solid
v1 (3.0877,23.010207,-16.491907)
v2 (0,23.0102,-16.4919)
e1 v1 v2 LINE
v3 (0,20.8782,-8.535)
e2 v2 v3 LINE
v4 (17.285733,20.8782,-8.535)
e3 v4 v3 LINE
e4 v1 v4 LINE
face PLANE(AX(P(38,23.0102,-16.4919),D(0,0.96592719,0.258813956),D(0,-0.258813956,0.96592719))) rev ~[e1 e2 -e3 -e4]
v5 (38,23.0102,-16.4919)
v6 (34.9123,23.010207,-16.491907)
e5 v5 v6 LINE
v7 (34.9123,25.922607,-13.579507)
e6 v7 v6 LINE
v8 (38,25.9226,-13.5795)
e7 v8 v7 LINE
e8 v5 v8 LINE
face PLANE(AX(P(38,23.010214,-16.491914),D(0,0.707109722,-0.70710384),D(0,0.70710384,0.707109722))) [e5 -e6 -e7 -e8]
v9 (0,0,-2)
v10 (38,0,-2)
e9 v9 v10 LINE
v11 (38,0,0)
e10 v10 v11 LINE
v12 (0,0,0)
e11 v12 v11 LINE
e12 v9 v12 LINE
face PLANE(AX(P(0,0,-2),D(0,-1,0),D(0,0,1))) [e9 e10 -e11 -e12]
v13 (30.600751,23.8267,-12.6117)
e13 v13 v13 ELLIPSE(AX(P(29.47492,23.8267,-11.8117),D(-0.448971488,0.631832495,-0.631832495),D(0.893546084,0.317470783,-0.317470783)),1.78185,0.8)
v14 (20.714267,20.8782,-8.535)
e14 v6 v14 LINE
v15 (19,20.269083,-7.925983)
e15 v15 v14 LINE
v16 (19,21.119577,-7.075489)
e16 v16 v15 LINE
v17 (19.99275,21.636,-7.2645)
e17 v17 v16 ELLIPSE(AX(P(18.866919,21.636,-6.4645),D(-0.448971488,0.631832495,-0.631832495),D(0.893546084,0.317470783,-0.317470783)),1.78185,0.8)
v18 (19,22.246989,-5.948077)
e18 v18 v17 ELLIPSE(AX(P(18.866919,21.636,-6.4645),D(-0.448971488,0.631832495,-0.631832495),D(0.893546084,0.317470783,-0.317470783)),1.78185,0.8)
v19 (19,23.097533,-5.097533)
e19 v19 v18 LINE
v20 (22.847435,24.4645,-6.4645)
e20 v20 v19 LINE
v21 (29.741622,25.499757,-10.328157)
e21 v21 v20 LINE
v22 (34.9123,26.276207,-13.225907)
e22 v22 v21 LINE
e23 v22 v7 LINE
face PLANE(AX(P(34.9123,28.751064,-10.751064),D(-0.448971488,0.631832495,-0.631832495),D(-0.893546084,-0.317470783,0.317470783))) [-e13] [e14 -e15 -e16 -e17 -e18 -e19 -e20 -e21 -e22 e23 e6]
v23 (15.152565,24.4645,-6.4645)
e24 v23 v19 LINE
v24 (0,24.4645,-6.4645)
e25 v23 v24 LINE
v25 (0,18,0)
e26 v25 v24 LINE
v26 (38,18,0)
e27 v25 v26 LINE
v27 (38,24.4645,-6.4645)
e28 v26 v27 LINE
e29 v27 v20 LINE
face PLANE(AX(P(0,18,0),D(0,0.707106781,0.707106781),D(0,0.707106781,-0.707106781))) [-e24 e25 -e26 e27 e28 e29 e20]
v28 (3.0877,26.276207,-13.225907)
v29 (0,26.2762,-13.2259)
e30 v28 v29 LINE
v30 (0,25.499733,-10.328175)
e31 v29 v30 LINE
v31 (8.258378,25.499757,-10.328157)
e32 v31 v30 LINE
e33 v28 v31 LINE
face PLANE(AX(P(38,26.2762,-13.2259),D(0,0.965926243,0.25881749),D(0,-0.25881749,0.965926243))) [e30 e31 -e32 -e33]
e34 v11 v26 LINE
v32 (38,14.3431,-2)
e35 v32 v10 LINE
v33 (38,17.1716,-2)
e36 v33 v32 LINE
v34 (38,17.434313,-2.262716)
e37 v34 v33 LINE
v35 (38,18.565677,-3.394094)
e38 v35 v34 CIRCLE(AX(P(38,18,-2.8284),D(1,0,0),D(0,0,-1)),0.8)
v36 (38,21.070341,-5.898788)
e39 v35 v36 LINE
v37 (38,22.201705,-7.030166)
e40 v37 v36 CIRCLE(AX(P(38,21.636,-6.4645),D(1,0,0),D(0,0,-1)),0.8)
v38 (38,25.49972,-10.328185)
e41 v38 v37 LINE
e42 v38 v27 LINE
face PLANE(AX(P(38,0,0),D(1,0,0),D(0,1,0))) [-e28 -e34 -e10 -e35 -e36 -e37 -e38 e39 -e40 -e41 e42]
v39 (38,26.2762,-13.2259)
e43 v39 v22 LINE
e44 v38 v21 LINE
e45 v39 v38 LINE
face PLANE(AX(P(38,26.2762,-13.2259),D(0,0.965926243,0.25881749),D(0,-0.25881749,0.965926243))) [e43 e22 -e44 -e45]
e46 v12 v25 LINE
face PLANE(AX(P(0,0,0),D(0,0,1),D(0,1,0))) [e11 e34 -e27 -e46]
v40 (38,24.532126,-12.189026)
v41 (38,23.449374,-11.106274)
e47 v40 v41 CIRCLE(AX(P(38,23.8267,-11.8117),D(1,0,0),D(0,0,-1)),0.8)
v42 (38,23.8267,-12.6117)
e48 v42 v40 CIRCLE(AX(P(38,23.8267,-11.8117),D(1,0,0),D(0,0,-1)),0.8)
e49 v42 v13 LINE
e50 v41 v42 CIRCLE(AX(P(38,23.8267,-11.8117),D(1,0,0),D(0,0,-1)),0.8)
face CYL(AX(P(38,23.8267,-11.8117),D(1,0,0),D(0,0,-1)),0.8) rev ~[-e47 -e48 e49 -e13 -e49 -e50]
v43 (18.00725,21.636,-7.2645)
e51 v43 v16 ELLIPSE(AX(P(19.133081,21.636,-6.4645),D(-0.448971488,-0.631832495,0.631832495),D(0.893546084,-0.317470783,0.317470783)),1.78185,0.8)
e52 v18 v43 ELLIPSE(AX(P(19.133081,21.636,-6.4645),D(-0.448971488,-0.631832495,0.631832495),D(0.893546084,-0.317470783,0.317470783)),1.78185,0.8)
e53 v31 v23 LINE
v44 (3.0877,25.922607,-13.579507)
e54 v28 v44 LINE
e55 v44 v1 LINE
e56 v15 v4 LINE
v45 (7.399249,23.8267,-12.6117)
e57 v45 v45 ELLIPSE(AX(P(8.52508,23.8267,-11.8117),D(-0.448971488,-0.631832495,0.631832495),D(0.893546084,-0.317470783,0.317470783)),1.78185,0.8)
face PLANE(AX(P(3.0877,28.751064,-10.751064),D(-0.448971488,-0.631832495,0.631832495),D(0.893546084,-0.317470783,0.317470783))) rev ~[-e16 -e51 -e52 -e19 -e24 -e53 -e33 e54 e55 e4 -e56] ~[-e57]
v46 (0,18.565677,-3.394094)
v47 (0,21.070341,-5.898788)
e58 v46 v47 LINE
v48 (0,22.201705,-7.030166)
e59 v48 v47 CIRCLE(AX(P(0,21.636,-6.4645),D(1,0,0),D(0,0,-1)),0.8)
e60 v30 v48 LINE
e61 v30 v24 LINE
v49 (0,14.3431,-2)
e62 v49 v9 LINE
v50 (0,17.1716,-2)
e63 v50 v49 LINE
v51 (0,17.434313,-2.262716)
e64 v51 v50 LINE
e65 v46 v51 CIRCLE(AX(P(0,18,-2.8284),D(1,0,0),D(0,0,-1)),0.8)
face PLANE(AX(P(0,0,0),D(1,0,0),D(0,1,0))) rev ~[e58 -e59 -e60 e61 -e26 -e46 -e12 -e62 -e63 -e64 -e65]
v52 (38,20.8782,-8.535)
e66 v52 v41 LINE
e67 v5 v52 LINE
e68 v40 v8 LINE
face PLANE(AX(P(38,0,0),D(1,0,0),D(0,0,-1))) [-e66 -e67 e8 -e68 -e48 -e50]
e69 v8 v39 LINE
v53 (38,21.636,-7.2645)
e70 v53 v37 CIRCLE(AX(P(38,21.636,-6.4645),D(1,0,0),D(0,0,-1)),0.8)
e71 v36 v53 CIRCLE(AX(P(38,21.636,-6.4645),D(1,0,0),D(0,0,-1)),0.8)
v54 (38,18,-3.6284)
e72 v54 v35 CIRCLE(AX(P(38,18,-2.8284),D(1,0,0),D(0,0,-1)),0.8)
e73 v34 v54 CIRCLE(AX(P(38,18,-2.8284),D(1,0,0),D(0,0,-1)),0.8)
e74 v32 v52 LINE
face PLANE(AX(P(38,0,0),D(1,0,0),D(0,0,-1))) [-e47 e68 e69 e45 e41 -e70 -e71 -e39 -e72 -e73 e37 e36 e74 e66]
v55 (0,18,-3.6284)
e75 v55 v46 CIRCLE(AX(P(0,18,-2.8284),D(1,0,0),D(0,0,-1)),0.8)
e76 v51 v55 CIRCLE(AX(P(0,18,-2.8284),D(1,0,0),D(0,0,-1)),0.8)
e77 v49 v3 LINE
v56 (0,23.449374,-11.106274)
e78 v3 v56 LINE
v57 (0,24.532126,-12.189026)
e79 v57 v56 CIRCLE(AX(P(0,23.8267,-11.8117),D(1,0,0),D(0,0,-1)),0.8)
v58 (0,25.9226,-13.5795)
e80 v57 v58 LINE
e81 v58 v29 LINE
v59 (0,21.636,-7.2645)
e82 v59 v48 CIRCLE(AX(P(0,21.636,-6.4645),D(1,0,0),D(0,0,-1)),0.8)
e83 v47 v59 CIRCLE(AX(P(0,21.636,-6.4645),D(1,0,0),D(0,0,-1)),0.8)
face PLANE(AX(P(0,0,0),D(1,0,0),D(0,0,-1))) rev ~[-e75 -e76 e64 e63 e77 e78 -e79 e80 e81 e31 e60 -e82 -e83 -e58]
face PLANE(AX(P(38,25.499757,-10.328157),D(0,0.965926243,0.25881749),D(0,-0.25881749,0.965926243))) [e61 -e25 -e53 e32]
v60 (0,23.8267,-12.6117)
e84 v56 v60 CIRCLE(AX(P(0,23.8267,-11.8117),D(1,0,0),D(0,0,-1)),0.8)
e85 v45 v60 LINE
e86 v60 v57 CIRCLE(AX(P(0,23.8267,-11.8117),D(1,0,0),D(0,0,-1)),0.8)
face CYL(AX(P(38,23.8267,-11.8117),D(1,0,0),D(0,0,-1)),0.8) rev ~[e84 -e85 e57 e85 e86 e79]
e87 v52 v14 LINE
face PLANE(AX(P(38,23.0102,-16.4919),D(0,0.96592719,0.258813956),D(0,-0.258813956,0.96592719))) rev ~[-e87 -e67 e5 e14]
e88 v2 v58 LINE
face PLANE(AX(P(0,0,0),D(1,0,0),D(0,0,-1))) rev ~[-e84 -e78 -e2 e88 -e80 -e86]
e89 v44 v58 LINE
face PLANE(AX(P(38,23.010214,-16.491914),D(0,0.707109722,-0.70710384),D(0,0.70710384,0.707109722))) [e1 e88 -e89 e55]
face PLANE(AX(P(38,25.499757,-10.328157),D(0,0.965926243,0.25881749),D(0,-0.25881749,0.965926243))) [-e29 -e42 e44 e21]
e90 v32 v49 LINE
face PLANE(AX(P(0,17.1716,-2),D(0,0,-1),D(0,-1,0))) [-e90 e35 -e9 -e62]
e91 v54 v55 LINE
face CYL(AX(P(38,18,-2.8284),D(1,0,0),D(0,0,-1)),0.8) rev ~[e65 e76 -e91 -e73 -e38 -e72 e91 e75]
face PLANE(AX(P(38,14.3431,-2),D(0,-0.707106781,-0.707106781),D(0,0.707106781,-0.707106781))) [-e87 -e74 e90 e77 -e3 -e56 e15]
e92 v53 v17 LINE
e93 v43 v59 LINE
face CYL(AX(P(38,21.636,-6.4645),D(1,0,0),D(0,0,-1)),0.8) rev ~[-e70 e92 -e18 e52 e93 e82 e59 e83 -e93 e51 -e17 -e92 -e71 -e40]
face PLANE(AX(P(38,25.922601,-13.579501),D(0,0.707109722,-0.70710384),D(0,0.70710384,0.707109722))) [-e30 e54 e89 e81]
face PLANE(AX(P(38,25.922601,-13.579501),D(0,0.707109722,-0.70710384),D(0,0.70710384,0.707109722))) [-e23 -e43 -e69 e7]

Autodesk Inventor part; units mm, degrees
ref_plane "YZ Plane" through (0, 0, 0) normal (1, 0, 0) x (0, 1, 0)
ref_plane "XZ Plane" through (0, 0, 0) normal (0, 1, 0) x (-1, 0, 0)
sketch "スケッチ1" plane through (0, 0, 0) normal (1, 0, 0) x (0, 1, 0)
  line L0 (0, 0) -> (18, 0)
  line L1 (18, 0) -> (18, -2)
  line L2 (18, -2) -> (0, -2)
  line L3 (0, -2) -> (0, 0)
  line L4 (18, 0) -> (39.2132, -21.2132)
  line L5 (39.2132, -21.2132) -> (37.799, -22.6274)
  line L6 (37.799, -22.6274) -> (17.1716, -2)
  dimension "d0" = 2
  dimension "d1" = 18
  dimension "d4" = 30
  dimension "d5" = 135
  dimension "d6" = 2
extrude "押し出し1" add sketch "スケッチ1" along normal blind 38
sketch "スケッチ2" plane through (38, 0, 0) normal (1, 0, 0) x (0, 0, -1)
  line L0 (13.2259, 26.2762) -> (6.4645, 24.4645) projected
  line L1 (2, 0) -> (2, 17.1716) projected
  line L2 (2, 17.1716) -> (22.6274, 37.799) projected
  line L3 (22.6274, 37.799) -> (21.2132, 39.2132) projected
  line L4 (21.2132, 39.2132) -> (0, 18) projected
  line L5 (0, 18) -> (0, 0) projected
  line L6 (0, 0) -> (2, 0) projected
  point P0 (10.3282, 25.4997)
extrude "押し出し2" cut sketch "スケッチ2" against normal through all contours L0 L4 L3 L2
sketch "スケッチ3" plane through (38, 0, 0) normal (1, 0, 0) x (0, 0, -1)
  line L0 (0, -0.1838) -> (49.5981, -49.7818) projected
  line L1 (49.5981, -49.7818) -> (50.9877, -48.3922) projected
  line L2 (50.9877, -48.3922) -> (50.3051, -40.5894) projected
  line L3 (50.3051, -40.5894) -> (38.2775, -28.5617) projected
  line L4 (38.2775, -28.5617) -> (34.3952, -14.0729) projected
  line L5 (34.3952, -14.0729) -> (39.6985, -8.7696) projected
  line L6 (25.2028, 5.7261) -> (39.6985, -8.7696) projected
  line L7 (25.2028, 9.9688) -> (25.2468, 10.0127) projected
  line L8 (25.2468, 14.2554) -> (13.2259, 26.2762) projected
  line L9 (13.2259, 26.2762) -> (6.4645, 24.4645) projected
  line L10 (6.4645, 24.4645) -> (0, 18) projected
  circle A0 centre (45.0018, -38.8216) radius 0.8 projected
  circle A1 centre (48.5373, -42.3571) radius 0.8 projected
  line L11 (25.2886, 2.8119) -> (28.6525, -0.552) projected
  arc A2 (29.0919, -1.6127) -> (28.6525, -0.552) centre (27.5919, -1.6127) ccw projected
  line L12 (29.0919, -1.6127) -> (29.0919, -20.7046) projected
  arc A3 (26.5312, -21.7652) -> (29.0919, -20.7046) centre (27.5919, -20.7046) ccw projected
  line L13 (26.5312, -21.7652) -> (23.1673, -18.4013) projected
  arc A4 (22.7279, -17.3406) -> (23.1673, -18.4013) centre (24.2279, -17.3406) ccw projected
  line L14 (22.7279, -17.3406) -> (22.7279, 1.7513) projected
  arc A5 (25.2886, 2.8119) -> (22.7279, 1.7513) centre (24.2279, 1.7513) ccw projected
  line L15 (13.8033, -9.0373) -> (10.4393, -5.6734) projected
  arc A6 (10, -4.6127) -> (10.4393, -5.6734) centre (11.5, -4.6127) ccw projected
  line L16 (10, -4.6127) -> (10, 14.4792) projected
  arc A7 (12.5607, 15.5398) -> (10, 14.4792) centre (11.5, 14.4792) ccw projected
  line L17 (12.5607, 15.5398) -> (15.9246, 12.1759) projected
  arc A8 (16.364, 11.1152) -> (15.9246, 12.1759) centre (14.864, 11.1152) ccw projected
  line L18 (16.364, 11.1152) -> (16.364, -7.9767) projected
  arc A9 (13.8033, -9.0373) -> (16.364, -7.9767) centre (14.864, -7.9767) ccw projected
  line L19 (2, 0) -> (2, 17.1716) projected
  line L20 (2, 14.3431) -> (13.5795, 25.9226)
  line L21 (16.4919, 23.0102) -> (8.535, 20.8782)
  line L22 (6.4645, 24.4645) -> (0, 18) projected
  line L23 (2, 17.1716) -> (10.3282, 25.4997) projected
  circle A10 centre (11.8117, 23.8267) radius 0.8 projected
  circle A11 centre (2.8284, 18) radius 0.8 projected
  circle A12 centre (6.4645, 21.636) radius 0.8 projected
  arc A13 (25.2468, 10.0127) -> (25.2468, 14.2554) centre (23.1254, 12.1341) ccw projected
  arc A14 (25.2028, 9.9688) -> (25.2028, 5.7261) centre (27.3241, 7.8475) ccw projected
  circle A15 centre (16.7615, 19.9122) radius 0.8 projected
  circle A16 centre (20.297, 16.3767) radius 0.8 projected
  line L24 (0, 18) -> (0, -0.1838) projected
  point P0 (0, 0)
  dimension "d9" = 4
  dimension "d10" = 4
ref_plane "作業平面1" through (0, -49.7818, -69.441) normal (1, 0, 0) x (0, 0.7071068, -0.7071068)
extrude "押し出し3" add sketch "スケッチ3" against normal up to surface (38 mm away) contours L9 L8 L20 A10 L19 L23 A11 A12 | A12 L23 | L8 L21 L20 A10 | A10 L20 | L20 A10 | A11 L23 picked at (6.7643, 21.5956) picked at (2.746, 17.7464)
sketch "スケッチ4" plane through (38, 0, 0) normal (1, 0, 0) x (0, 0, -1)
  circle A0 centre (2.8284, 18) radius 0.8
  circle A1 centre (6.4645, 21.636) radius 0.8
  circle A2 centre (11.8117, 23.8267) radius 0.8
  line L0 (6.4645, 24.4645) -> (0, 18) projected
  line L1 (13.2259, 26.2762) -> (6.4645, 24.4645) projected
  line L2 (11.8117, 23.8267) -> (11.2941, 25.7586)
  point P0 (0, 0)
  dimension "d13" = 1.6
  dimension "d14" = 2
  dimension "d15" = 2
  dimension "d16" = 2
  dimension "d17" = 2
extrude "押し出し4" cut sketch "スケッチ4" against normal through all
sketch "スケッチ5" plane through (0, 18, 0) normal (0, 0.7071068, 0.7071068) x (1, 0, 0)
  line L0 (19, 8.3282) -> (1.5, 17.1212) projected
  line L1 (36.5, 17.1212) -> (19, 8.3282) projected
  line L2 (38, 15.2043) -> (0, 15.2043) projected
  line L3 (3.0877, 15.2043) -> (19, 7.209)
  line L4 (38, 15.2043) -> (0, 15.2043) projected
  line L5 (34.9123, 15.2043) -> (19, 7.209)
  point P0 (0, -12.7279)
  dimension "d20" = 1
extrude "押し出し5" cut sketch "スケッチ5" against normal through all
equation "\"d15\" = d14"
properties part number "upper"
